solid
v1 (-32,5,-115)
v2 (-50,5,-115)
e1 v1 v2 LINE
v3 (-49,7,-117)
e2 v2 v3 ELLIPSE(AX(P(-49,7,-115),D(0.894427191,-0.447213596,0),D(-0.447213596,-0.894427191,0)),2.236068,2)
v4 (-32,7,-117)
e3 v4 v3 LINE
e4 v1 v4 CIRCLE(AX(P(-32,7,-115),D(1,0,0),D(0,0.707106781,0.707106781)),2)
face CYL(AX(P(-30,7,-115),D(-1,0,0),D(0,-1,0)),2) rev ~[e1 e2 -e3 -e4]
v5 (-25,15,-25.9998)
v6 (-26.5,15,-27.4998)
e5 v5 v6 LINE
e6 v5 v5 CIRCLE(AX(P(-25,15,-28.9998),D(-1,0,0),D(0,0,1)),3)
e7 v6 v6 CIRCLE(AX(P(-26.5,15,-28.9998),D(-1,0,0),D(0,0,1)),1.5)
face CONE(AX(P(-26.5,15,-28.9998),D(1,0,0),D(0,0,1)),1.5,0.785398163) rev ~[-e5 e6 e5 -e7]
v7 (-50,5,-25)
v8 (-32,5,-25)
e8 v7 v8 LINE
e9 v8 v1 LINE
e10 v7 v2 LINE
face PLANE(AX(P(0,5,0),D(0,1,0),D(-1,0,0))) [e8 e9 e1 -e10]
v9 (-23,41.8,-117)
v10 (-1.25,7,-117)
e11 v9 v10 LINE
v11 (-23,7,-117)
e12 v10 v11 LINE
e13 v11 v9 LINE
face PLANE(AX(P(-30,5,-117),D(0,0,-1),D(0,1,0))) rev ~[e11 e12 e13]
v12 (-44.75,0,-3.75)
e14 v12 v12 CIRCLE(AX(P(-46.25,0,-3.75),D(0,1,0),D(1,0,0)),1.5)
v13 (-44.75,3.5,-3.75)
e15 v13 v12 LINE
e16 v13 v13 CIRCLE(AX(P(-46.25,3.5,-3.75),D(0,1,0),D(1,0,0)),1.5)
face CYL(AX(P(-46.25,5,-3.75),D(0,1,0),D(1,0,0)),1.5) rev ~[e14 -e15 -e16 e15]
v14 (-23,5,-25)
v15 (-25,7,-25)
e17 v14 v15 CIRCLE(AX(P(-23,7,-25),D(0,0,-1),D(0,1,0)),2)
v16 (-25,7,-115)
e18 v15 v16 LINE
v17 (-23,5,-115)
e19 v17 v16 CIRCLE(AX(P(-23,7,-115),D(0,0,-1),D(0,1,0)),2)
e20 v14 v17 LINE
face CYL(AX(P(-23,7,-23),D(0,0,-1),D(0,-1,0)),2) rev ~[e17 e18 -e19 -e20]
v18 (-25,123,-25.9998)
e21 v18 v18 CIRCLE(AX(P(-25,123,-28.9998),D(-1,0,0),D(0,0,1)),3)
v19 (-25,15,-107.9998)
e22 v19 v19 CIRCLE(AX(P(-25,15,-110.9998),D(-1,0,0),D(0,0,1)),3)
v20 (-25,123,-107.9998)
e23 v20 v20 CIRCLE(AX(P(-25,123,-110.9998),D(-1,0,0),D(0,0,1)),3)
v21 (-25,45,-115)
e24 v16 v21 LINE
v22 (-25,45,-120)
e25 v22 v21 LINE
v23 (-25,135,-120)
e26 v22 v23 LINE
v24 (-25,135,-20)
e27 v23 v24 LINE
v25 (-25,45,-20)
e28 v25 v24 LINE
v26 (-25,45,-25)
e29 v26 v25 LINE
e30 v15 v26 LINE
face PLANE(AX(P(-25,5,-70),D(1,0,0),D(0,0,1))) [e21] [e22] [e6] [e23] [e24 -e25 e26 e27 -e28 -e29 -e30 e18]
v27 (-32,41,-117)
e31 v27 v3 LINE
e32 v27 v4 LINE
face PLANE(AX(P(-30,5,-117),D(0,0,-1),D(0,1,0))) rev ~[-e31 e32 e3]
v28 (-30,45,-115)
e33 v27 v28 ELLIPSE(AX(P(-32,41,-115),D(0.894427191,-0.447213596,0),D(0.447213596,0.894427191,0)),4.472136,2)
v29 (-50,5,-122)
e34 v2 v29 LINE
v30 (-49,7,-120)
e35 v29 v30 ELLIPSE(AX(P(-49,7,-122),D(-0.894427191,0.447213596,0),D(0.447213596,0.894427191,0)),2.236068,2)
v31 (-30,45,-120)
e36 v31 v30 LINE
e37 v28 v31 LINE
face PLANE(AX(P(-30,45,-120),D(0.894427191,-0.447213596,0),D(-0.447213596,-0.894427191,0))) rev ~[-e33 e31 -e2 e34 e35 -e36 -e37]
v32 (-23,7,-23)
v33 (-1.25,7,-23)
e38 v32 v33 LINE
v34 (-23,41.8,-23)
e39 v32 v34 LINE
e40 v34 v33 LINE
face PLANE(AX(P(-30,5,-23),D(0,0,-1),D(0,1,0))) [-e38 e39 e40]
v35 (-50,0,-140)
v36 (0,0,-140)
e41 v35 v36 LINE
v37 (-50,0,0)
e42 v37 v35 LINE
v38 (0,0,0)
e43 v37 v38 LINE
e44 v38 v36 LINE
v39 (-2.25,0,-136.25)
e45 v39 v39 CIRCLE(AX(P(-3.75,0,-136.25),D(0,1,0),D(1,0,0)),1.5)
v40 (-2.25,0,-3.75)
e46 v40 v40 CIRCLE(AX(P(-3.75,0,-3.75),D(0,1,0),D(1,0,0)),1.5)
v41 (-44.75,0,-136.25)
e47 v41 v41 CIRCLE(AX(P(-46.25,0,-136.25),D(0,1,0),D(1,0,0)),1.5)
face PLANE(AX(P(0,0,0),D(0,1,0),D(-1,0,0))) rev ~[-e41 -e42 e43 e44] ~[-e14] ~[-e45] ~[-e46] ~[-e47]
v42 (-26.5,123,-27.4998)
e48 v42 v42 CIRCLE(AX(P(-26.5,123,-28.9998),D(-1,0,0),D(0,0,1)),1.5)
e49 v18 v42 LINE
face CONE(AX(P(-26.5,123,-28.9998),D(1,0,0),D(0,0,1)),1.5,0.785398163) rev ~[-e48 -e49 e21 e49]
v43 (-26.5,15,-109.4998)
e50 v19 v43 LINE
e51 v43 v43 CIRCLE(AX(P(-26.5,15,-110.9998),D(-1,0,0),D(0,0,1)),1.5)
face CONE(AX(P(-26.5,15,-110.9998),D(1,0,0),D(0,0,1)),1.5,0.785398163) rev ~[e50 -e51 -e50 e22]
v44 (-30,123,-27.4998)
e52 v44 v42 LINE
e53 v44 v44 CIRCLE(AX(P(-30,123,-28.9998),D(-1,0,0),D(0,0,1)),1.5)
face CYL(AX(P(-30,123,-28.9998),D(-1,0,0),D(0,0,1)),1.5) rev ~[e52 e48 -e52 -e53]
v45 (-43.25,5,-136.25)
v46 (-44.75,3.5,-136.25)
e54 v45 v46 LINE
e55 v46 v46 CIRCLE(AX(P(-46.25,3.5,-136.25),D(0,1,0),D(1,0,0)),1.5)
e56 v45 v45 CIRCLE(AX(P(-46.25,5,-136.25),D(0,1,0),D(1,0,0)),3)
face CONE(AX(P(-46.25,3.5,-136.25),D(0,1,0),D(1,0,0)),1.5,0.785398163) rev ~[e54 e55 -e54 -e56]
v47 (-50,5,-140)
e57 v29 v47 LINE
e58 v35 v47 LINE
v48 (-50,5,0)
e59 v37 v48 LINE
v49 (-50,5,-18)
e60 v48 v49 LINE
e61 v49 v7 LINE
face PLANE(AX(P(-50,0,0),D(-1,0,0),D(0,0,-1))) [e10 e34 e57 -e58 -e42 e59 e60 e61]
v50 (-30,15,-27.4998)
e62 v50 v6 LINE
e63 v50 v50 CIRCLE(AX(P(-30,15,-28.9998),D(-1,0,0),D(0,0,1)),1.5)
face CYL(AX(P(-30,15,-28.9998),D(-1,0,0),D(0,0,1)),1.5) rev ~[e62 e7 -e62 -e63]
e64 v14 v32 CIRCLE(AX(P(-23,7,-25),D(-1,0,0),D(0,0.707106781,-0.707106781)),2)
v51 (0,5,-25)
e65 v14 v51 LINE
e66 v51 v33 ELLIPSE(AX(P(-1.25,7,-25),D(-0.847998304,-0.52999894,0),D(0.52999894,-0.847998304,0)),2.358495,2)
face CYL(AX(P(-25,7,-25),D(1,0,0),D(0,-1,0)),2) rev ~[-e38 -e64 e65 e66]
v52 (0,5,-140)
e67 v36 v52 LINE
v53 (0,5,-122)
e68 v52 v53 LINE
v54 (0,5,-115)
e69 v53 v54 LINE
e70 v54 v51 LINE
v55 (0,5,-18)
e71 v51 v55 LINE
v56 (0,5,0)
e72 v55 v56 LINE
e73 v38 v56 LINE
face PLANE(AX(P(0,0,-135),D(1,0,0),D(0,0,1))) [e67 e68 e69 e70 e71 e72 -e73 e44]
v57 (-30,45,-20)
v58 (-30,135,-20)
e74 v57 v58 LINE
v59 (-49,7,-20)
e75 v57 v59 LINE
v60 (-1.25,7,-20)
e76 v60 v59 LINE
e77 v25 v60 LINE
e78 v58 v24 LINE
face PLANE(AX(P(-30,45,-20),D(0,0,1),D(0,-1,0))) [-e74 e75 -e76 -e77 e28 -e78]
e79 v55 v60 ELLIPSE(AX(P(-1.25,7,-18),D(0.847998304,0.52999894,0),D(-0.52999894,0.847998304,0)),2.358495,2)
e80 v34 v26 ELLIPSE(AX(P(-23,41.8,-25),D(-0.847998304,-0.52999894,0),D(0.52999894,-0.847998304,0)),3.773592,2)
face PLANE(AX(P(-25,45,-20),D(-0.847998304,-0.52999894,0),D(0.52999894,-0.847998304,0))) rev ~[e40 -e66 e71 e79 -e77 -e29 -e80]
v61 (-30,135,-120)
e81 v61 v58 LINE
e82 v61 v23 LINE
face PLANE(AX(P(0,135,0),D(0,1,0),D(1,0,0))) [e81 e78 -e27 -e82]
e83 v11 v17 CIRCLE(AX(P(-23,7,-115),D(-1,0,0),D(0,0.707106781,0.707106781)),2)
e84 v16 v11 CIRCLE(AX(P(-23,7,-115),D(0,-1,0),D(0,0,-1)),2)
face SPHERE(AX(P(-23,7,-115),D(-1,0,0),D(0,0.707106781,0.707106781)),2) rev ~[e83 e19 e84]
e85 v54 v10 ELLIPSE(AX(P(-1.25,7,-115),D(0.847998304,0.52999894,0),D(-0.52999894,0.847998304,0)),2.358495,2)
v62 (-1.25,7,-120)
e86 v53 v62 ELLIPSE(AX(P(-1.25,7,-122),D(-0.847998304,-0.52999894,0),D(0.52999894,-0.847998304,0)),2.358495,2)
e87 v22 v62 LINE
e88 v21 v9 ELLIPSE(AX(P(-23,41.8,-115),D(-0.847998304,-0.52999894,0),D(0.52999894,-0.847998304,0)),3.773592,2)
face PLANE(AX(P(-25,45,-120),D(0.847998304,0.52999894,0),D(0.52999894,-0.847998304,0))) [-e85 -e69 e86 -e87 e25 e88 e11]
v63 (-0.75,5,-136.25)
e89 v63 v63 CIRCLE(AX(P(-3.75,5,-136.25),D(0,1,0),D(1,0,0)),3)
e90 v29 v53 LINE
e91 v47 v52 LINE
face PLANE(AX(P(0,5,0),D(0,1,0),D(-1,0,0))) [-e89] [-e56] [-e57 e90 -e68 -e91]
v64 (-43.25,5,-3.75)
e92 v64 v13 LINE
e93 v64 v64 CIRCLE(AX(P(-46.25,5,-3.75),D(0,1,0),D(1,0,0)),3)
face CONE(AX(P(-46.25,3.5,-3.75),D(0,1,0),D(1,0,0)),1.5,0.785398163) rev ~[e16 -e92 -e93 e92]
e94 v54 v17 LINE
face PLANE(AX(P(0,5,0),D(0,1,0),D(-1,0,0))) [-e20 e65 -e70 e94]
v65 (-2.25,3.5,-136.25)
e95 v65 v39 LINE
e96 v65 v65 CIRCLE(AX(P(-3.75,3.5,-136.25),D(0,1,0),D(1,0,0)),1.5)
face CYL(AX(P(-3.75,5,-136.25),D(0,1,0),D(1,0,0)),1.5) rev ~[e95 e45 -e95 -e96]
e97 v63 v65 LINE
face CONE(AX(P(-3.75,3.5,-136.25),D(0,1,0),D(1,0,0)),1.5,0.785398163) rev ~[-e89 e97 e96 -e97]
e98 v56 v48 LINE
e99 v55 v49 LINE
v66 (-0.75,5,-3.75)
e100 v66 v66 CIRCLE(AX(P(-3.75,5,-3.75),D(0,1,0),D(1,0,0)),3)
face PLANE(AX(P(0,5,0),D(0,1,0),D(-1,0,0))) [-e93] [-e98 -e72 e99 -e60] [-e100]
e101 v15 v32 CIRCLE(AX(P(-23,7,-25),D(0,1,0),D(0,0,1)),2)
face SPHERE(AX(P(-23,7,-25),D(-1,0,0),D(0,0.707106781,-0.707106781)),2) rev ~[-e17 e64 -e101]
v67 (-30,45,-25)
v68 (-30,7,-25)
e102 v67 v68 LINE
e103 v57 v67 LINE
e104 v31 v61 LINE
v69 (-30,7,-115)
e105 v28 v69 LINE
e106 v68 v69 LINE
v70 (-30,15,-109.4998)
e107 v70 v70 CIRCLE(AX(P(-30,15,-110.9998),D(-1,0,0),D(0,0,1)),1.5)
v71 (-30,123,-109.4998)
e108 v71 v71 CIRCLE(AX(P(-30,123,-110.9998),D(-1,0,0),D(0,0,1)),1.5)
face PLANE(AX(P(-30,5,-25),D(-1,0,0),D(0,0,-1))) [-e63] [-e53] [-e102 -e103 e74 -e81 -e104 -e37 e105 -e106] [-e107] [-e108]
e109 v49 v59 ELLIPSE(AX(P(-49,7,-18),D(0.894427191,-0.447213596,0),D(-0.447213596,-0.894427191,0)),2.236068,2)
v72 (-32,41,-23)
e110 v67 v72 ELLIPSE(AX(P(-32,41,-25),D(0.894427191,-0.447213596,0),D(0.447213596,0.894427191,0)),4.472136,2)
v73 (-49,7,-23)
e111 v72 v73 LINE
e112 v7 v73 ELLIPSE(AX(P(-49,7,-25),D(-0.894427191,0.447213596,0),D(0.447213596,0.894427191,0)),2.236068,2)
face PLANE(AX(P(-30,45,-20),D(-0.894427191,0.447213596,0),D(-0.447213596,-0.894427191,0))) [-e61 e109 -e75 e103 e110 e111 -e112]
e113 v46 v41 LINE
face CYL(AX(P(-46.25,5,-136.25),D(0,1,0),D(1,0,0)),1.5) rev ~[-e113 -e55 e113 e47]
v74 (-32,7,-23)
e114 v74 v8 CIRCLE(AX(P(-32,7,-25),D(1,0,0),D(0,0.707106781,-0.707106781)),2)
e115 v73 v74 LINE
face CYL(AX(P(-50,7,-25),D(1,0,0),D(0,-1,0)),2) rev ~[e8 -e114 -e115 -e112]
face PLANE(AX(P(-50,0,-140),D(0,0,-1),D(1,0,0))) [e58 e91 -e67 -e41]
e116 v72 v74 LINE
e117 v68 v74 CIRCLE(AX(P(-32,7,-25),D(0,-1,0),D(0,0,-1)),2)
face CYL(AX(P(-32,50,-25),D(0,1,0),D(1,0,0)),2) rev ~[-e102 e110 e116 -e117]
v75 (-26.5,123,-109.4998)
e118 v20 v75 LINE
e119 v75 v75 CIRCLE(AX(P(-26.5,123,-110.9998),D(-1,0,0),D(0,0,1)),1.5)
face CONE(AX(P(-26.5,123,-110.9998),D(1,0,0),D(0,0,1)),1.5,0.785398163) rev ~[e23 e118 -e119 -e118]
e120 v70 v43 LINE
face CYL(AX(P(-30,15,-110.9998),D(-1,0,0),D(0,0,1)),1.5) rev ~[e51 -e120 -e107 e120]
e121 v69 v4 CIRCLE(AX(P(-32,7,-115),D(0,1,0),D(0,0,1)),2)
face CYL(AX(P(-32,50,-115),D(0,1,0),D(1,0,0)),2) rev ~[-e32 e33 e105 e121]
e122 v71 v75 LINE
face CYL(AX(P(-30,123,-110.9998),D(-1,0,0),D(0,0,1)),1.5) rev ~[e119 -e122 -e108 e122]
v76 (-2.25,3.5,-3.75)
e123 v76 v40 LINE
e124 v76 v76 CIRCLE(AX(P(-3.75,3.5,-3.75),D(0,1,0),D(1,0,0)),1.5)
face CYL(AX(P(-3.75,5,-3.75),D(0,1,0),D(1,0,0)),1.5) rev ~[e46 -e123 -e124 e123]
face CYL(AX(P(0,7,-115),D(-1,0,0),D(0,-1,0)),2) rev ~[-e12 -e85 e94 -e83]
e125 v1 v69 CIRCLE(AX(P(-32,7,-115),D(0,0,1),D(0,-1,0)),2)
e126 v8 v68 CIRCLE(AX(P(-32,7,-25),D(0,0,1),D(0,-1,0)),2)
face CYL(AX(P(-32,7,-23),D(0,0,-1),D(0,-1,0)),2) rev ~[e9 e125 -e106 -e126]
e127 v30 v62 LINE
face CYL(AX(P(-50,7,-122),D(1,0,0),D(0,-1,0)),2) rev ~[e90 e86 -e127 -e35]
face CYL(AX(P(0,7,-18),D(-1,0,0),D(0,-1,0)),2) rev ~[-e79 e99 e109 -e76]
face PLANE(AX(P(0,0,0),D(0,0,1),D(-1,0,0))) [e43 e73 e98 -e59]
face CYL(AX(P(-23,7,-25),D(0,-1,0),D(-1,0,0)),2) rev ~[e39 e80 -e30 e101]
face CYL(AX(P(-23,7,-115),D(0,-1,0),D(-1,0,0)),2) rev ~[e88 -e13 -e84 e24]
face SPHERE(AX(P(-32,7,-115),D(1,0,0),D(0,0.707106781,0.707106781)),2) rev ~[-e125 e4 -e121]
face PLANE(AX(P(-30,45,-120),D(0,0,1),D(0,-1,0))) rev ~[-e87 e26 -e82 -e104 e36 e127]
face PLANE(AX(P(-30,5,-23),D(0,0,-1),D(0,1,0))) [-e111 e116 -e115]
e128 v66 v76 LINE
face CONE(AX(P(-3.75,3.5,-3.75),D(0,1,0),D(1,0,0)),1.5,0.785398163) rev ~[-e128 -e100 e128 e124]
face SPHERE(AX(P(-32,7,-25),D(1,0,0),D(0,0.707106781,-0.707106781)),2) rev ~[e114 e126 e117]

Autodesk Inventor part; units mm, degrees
ref_plane "YZ Plane" through (0, 0, 0) normal (1, 0, 0) x (0, 1, 0)
ref_plane "XZ Plane" through (0, 0, 0) normal (0, 1, 0) x (-1, 0, 0)
ref_plane "XY Plane" through (0, 0, 0) normal (0, 0, 1) x (1, 0, 0)
sketch "Sketch1" plane through (0, 0, 0) normal (0, 1, 0) x (-1, 0, 0)
  line L0 (0, 0) -> (46, 0)
  line L1 (0, -135) -> (0, 0)
  line L2 (0, 0) -> (50, 0)
  line L3 (50, 0) -> (50, -140)
  line L4 (50, -140) -> (0, -140)
  line L5 (0, -140) -> (0, 0)
  dimension "d36" = 50
  dimension "d37" = 140
extrude "Extrusion1" add sketch "Sketch1" along normal blind 5
sketch "Sketch2" plane through (0, 5, 0) normal (0, 1, 0) x (1, 0, 0)
  line L0 (0, 2.5) -> (17, 2.5) construction
  circle A0 centre (-3.75, 136.25) radius 1.5
  circle A1 centre (-46.25, 136.25) radius 1.5
  line L1 (0, 0) -> (-3.75, 0)
  circle A2 centre (-3.75, 3.75) radius 1.5
  circle A3 centre (-46.25, 3.75) radius 1.5
  point P0 (0, 135)
  point P1 (-50, 140)
  point P2 (0, 140)
  dimension "d103" = 3
  dimension "d106" = 3
  dimension "d109" = 3
  dimension "d110" = 3
extrude "Extrusion4" cut sketch "Sketch2" against normal through all
sketch "Sketch3" plane through (0, 5, 0) normal (0, 1, 0) x (1, 0, 0)
  line L0 (0, 0) -> (0, 140) projected
  line L1 (0, 70) -> (-25, 70)
  line L2 (0, 140) -> (-50, 140) projected
  line L3 (-25, 70) -> (-30, 70)
  line L4 (-30, 115) -> (-30, 70)
  line L5 (-30, 25) -> (-30, 70)
  line L6 (-30, 115) -> (-25, 115)
  line L7 (-25, 115) -> (-25, 25)
  line L8 (-25, 25) -> (-30, 25)
  line L9 (-30, 25) -> (-30, 115)
  line L10 (-25, 115) -> (-30, 115)
  line L11 (-30, 115) -> (-30, 120)
  line L12 (-30, 120) -> (-25, 120)
  line L13 (-25, 120) -> (-25, 115)
  line L14 (-25, 25) -> (-30, 25)
  line L15 (-30, 25) -> (-30, 20)
  line L16 (-30, 20) -> (-25, 20)
  line L17 (-25, 20) -> (-25, 25)
  dimension "d55" = 5
  dimension "d56" = 5
extrude "Extrusion5" add sketch "Sketch3" along normal blind 130
sketch "Sketch5" plane through (-30, 5, -120) normal (-1, 0, 0) x (0, 0, 1)
  line L0 (100, 0) -> (100, 130) projected
  line L1 (120, 0) -> (-20, 0) projected
  circle A0 centre (9.0002, 118) radius 1.5
  circle A1 centre (91.0002, 118) radius 1.5
  circle A2 centre (91.0002, 10) radius 1.5
  circle A3 centre (9.0002, 10) radius 1.5
  point P0 (120, -5)
  dimension "d62" = 3
  dimension "d63" = 3
  dimension "d64" = 3
  dimension "d65" = 3
extrude "Extrusion6" cut sketch "Sketch5" against normal up to surface (5 mm away)
sketch "Sketch6" plane through (-30, 5, -120) normal (-1, 0, 0) x (0, 0, 1)
  line L0 (0, 0) -> (3, 0)
  line L1 (3, 0) -> (3, 40)
  line L2 (3, 40) -> (0, 40)
  line L3 (0, 40) -> (0, 0)
  line L4 (100, 0) -> (0, 0) projected
  line L5 (100, 0) -> (97, 0)
  line L6 (97, 0) -> (97, 40)
  line L7 (97, 40) -> (100, 40)
  line L8 (100, 40) -> (100, 0)
  point P0 (120, -5)
  dimension "d68" = 3
  dimension "d69" = 40
  dimension "d70" = 3
  dimension "d71" = 40
extrude "Extrusion7" add sketch "Sketch6" along normal blind 20 and the other way blind 30
sketch "Sketch7" plane through (0, 5, -120) normal (0, 0, -1) x (-1, 0, 0)
  line L0 (0, 40) -> (25, 40) projected
  line L1 (50, 0) -> (50, 40) projected
  line L2 (0, 40) -> (50, 40)
  line L3 (50, 40) -> (50, 0)
  line L4 (50, 0) -> (0, 0)
  line L5 (0, 0) -> (0, 40)
  line L6 (50, 0) -> (0, 0) projected
  line L7 (25, 40) -> (0, 0)
  line L8 (30, 40) -> (50, 0)
  point P0 (0, -5)
sketch "Sketch8" plane through (-50, 5, -20) normal (0, 0, 1) x (1, 0, 0)
  line L0 (20, 40) -> (0, 40) projected
  line L1 (50, 40) -> (50, 0) projected
  line L2 (0, 40) -> (50, 40)
  line L3 (50, 40) -> (50, 0)
  line L4 (50, 0) -> (0, 0)
  line L5 (0, 0) -> (0, 40)
  line L6 (20, 40) -> (0, 0)
  line L7 (50, 40) -> (25, 40) projected
  line L8 (25, 40) -> (50, 0)
  point P0 (50, -5)
extrude "Extrusion8" cut sketch "Sketch8" against normal up to surface (3 mm away) contours L6 L5 L0 | L2 L1 L8
extrude "Extrusion9" cut sketch "Sketch7" against normal up to surface (3 mm away) contours L0 L7 L5 | L2 L1 L8
fillet "Fillet1" radius 2 8 edges at (-30, 5, -70) (-25, 5, -70) (-12.5, 5, -117) (-40, 5, -117) (-40, 5, -23) (-12.5, 5, -23) (-25, 5, -20) (-25, 5, -120)
thread "Thread5" size "M3x0.5" class "6H" standard "ANSI Metric M Profile" full length
thread "Thread6" size "M3x0.5" class "6H" standard "ANSI Metric M Profile" full length
thread "Thread7" size "M3x0.5" class "6H" standard "ANSI Metric M Profile" full length
thread "Thread8" size "M3x0.5" class "6H" standard "ANSI Metric M Profile" full length
fillet "Fillet2" radius 2 8 edges at (-30.5858, 5.5858, -23.5858) (-30, 26, -23) (-30.5858, 5.5858, -116.4142) (-30, 26, -117) (-24.4142, 5.5858, -116.4142) (-25, 26, -117) (-24.4142, 5.5858, -23.5858) (-25, 26, -23)
chamfer "Chamfer1" distance 1.5 angle 45 8 edges at (-25, 123, -30.4998) (-25, 123, -112.4998) (-25, 15, -112.4998) (-25, 15, -30.4998) (-5.25, 5, -136.25) (-47.75, 5, -136.25) (-5.25, 5, -3.75) (-47.75, 5, -3.75)
chamfer_without_effect "Chamfer2"
thread "Thread13" size "M3x0.5" class "6H" standard "ANSI Metric M Profile" full length
thread "Thread14" size "M3x0.5" class "6H" standard "ANSI Metric M Profile" full length
thread "Thread15" size "M3x0.5" class "6H" standard "ANSI Metric M Profile" full length
thread "Thread16" size "M3x0.5" class "6H" standard "ANSI Metric M Profile" full length
properties part number "support"
